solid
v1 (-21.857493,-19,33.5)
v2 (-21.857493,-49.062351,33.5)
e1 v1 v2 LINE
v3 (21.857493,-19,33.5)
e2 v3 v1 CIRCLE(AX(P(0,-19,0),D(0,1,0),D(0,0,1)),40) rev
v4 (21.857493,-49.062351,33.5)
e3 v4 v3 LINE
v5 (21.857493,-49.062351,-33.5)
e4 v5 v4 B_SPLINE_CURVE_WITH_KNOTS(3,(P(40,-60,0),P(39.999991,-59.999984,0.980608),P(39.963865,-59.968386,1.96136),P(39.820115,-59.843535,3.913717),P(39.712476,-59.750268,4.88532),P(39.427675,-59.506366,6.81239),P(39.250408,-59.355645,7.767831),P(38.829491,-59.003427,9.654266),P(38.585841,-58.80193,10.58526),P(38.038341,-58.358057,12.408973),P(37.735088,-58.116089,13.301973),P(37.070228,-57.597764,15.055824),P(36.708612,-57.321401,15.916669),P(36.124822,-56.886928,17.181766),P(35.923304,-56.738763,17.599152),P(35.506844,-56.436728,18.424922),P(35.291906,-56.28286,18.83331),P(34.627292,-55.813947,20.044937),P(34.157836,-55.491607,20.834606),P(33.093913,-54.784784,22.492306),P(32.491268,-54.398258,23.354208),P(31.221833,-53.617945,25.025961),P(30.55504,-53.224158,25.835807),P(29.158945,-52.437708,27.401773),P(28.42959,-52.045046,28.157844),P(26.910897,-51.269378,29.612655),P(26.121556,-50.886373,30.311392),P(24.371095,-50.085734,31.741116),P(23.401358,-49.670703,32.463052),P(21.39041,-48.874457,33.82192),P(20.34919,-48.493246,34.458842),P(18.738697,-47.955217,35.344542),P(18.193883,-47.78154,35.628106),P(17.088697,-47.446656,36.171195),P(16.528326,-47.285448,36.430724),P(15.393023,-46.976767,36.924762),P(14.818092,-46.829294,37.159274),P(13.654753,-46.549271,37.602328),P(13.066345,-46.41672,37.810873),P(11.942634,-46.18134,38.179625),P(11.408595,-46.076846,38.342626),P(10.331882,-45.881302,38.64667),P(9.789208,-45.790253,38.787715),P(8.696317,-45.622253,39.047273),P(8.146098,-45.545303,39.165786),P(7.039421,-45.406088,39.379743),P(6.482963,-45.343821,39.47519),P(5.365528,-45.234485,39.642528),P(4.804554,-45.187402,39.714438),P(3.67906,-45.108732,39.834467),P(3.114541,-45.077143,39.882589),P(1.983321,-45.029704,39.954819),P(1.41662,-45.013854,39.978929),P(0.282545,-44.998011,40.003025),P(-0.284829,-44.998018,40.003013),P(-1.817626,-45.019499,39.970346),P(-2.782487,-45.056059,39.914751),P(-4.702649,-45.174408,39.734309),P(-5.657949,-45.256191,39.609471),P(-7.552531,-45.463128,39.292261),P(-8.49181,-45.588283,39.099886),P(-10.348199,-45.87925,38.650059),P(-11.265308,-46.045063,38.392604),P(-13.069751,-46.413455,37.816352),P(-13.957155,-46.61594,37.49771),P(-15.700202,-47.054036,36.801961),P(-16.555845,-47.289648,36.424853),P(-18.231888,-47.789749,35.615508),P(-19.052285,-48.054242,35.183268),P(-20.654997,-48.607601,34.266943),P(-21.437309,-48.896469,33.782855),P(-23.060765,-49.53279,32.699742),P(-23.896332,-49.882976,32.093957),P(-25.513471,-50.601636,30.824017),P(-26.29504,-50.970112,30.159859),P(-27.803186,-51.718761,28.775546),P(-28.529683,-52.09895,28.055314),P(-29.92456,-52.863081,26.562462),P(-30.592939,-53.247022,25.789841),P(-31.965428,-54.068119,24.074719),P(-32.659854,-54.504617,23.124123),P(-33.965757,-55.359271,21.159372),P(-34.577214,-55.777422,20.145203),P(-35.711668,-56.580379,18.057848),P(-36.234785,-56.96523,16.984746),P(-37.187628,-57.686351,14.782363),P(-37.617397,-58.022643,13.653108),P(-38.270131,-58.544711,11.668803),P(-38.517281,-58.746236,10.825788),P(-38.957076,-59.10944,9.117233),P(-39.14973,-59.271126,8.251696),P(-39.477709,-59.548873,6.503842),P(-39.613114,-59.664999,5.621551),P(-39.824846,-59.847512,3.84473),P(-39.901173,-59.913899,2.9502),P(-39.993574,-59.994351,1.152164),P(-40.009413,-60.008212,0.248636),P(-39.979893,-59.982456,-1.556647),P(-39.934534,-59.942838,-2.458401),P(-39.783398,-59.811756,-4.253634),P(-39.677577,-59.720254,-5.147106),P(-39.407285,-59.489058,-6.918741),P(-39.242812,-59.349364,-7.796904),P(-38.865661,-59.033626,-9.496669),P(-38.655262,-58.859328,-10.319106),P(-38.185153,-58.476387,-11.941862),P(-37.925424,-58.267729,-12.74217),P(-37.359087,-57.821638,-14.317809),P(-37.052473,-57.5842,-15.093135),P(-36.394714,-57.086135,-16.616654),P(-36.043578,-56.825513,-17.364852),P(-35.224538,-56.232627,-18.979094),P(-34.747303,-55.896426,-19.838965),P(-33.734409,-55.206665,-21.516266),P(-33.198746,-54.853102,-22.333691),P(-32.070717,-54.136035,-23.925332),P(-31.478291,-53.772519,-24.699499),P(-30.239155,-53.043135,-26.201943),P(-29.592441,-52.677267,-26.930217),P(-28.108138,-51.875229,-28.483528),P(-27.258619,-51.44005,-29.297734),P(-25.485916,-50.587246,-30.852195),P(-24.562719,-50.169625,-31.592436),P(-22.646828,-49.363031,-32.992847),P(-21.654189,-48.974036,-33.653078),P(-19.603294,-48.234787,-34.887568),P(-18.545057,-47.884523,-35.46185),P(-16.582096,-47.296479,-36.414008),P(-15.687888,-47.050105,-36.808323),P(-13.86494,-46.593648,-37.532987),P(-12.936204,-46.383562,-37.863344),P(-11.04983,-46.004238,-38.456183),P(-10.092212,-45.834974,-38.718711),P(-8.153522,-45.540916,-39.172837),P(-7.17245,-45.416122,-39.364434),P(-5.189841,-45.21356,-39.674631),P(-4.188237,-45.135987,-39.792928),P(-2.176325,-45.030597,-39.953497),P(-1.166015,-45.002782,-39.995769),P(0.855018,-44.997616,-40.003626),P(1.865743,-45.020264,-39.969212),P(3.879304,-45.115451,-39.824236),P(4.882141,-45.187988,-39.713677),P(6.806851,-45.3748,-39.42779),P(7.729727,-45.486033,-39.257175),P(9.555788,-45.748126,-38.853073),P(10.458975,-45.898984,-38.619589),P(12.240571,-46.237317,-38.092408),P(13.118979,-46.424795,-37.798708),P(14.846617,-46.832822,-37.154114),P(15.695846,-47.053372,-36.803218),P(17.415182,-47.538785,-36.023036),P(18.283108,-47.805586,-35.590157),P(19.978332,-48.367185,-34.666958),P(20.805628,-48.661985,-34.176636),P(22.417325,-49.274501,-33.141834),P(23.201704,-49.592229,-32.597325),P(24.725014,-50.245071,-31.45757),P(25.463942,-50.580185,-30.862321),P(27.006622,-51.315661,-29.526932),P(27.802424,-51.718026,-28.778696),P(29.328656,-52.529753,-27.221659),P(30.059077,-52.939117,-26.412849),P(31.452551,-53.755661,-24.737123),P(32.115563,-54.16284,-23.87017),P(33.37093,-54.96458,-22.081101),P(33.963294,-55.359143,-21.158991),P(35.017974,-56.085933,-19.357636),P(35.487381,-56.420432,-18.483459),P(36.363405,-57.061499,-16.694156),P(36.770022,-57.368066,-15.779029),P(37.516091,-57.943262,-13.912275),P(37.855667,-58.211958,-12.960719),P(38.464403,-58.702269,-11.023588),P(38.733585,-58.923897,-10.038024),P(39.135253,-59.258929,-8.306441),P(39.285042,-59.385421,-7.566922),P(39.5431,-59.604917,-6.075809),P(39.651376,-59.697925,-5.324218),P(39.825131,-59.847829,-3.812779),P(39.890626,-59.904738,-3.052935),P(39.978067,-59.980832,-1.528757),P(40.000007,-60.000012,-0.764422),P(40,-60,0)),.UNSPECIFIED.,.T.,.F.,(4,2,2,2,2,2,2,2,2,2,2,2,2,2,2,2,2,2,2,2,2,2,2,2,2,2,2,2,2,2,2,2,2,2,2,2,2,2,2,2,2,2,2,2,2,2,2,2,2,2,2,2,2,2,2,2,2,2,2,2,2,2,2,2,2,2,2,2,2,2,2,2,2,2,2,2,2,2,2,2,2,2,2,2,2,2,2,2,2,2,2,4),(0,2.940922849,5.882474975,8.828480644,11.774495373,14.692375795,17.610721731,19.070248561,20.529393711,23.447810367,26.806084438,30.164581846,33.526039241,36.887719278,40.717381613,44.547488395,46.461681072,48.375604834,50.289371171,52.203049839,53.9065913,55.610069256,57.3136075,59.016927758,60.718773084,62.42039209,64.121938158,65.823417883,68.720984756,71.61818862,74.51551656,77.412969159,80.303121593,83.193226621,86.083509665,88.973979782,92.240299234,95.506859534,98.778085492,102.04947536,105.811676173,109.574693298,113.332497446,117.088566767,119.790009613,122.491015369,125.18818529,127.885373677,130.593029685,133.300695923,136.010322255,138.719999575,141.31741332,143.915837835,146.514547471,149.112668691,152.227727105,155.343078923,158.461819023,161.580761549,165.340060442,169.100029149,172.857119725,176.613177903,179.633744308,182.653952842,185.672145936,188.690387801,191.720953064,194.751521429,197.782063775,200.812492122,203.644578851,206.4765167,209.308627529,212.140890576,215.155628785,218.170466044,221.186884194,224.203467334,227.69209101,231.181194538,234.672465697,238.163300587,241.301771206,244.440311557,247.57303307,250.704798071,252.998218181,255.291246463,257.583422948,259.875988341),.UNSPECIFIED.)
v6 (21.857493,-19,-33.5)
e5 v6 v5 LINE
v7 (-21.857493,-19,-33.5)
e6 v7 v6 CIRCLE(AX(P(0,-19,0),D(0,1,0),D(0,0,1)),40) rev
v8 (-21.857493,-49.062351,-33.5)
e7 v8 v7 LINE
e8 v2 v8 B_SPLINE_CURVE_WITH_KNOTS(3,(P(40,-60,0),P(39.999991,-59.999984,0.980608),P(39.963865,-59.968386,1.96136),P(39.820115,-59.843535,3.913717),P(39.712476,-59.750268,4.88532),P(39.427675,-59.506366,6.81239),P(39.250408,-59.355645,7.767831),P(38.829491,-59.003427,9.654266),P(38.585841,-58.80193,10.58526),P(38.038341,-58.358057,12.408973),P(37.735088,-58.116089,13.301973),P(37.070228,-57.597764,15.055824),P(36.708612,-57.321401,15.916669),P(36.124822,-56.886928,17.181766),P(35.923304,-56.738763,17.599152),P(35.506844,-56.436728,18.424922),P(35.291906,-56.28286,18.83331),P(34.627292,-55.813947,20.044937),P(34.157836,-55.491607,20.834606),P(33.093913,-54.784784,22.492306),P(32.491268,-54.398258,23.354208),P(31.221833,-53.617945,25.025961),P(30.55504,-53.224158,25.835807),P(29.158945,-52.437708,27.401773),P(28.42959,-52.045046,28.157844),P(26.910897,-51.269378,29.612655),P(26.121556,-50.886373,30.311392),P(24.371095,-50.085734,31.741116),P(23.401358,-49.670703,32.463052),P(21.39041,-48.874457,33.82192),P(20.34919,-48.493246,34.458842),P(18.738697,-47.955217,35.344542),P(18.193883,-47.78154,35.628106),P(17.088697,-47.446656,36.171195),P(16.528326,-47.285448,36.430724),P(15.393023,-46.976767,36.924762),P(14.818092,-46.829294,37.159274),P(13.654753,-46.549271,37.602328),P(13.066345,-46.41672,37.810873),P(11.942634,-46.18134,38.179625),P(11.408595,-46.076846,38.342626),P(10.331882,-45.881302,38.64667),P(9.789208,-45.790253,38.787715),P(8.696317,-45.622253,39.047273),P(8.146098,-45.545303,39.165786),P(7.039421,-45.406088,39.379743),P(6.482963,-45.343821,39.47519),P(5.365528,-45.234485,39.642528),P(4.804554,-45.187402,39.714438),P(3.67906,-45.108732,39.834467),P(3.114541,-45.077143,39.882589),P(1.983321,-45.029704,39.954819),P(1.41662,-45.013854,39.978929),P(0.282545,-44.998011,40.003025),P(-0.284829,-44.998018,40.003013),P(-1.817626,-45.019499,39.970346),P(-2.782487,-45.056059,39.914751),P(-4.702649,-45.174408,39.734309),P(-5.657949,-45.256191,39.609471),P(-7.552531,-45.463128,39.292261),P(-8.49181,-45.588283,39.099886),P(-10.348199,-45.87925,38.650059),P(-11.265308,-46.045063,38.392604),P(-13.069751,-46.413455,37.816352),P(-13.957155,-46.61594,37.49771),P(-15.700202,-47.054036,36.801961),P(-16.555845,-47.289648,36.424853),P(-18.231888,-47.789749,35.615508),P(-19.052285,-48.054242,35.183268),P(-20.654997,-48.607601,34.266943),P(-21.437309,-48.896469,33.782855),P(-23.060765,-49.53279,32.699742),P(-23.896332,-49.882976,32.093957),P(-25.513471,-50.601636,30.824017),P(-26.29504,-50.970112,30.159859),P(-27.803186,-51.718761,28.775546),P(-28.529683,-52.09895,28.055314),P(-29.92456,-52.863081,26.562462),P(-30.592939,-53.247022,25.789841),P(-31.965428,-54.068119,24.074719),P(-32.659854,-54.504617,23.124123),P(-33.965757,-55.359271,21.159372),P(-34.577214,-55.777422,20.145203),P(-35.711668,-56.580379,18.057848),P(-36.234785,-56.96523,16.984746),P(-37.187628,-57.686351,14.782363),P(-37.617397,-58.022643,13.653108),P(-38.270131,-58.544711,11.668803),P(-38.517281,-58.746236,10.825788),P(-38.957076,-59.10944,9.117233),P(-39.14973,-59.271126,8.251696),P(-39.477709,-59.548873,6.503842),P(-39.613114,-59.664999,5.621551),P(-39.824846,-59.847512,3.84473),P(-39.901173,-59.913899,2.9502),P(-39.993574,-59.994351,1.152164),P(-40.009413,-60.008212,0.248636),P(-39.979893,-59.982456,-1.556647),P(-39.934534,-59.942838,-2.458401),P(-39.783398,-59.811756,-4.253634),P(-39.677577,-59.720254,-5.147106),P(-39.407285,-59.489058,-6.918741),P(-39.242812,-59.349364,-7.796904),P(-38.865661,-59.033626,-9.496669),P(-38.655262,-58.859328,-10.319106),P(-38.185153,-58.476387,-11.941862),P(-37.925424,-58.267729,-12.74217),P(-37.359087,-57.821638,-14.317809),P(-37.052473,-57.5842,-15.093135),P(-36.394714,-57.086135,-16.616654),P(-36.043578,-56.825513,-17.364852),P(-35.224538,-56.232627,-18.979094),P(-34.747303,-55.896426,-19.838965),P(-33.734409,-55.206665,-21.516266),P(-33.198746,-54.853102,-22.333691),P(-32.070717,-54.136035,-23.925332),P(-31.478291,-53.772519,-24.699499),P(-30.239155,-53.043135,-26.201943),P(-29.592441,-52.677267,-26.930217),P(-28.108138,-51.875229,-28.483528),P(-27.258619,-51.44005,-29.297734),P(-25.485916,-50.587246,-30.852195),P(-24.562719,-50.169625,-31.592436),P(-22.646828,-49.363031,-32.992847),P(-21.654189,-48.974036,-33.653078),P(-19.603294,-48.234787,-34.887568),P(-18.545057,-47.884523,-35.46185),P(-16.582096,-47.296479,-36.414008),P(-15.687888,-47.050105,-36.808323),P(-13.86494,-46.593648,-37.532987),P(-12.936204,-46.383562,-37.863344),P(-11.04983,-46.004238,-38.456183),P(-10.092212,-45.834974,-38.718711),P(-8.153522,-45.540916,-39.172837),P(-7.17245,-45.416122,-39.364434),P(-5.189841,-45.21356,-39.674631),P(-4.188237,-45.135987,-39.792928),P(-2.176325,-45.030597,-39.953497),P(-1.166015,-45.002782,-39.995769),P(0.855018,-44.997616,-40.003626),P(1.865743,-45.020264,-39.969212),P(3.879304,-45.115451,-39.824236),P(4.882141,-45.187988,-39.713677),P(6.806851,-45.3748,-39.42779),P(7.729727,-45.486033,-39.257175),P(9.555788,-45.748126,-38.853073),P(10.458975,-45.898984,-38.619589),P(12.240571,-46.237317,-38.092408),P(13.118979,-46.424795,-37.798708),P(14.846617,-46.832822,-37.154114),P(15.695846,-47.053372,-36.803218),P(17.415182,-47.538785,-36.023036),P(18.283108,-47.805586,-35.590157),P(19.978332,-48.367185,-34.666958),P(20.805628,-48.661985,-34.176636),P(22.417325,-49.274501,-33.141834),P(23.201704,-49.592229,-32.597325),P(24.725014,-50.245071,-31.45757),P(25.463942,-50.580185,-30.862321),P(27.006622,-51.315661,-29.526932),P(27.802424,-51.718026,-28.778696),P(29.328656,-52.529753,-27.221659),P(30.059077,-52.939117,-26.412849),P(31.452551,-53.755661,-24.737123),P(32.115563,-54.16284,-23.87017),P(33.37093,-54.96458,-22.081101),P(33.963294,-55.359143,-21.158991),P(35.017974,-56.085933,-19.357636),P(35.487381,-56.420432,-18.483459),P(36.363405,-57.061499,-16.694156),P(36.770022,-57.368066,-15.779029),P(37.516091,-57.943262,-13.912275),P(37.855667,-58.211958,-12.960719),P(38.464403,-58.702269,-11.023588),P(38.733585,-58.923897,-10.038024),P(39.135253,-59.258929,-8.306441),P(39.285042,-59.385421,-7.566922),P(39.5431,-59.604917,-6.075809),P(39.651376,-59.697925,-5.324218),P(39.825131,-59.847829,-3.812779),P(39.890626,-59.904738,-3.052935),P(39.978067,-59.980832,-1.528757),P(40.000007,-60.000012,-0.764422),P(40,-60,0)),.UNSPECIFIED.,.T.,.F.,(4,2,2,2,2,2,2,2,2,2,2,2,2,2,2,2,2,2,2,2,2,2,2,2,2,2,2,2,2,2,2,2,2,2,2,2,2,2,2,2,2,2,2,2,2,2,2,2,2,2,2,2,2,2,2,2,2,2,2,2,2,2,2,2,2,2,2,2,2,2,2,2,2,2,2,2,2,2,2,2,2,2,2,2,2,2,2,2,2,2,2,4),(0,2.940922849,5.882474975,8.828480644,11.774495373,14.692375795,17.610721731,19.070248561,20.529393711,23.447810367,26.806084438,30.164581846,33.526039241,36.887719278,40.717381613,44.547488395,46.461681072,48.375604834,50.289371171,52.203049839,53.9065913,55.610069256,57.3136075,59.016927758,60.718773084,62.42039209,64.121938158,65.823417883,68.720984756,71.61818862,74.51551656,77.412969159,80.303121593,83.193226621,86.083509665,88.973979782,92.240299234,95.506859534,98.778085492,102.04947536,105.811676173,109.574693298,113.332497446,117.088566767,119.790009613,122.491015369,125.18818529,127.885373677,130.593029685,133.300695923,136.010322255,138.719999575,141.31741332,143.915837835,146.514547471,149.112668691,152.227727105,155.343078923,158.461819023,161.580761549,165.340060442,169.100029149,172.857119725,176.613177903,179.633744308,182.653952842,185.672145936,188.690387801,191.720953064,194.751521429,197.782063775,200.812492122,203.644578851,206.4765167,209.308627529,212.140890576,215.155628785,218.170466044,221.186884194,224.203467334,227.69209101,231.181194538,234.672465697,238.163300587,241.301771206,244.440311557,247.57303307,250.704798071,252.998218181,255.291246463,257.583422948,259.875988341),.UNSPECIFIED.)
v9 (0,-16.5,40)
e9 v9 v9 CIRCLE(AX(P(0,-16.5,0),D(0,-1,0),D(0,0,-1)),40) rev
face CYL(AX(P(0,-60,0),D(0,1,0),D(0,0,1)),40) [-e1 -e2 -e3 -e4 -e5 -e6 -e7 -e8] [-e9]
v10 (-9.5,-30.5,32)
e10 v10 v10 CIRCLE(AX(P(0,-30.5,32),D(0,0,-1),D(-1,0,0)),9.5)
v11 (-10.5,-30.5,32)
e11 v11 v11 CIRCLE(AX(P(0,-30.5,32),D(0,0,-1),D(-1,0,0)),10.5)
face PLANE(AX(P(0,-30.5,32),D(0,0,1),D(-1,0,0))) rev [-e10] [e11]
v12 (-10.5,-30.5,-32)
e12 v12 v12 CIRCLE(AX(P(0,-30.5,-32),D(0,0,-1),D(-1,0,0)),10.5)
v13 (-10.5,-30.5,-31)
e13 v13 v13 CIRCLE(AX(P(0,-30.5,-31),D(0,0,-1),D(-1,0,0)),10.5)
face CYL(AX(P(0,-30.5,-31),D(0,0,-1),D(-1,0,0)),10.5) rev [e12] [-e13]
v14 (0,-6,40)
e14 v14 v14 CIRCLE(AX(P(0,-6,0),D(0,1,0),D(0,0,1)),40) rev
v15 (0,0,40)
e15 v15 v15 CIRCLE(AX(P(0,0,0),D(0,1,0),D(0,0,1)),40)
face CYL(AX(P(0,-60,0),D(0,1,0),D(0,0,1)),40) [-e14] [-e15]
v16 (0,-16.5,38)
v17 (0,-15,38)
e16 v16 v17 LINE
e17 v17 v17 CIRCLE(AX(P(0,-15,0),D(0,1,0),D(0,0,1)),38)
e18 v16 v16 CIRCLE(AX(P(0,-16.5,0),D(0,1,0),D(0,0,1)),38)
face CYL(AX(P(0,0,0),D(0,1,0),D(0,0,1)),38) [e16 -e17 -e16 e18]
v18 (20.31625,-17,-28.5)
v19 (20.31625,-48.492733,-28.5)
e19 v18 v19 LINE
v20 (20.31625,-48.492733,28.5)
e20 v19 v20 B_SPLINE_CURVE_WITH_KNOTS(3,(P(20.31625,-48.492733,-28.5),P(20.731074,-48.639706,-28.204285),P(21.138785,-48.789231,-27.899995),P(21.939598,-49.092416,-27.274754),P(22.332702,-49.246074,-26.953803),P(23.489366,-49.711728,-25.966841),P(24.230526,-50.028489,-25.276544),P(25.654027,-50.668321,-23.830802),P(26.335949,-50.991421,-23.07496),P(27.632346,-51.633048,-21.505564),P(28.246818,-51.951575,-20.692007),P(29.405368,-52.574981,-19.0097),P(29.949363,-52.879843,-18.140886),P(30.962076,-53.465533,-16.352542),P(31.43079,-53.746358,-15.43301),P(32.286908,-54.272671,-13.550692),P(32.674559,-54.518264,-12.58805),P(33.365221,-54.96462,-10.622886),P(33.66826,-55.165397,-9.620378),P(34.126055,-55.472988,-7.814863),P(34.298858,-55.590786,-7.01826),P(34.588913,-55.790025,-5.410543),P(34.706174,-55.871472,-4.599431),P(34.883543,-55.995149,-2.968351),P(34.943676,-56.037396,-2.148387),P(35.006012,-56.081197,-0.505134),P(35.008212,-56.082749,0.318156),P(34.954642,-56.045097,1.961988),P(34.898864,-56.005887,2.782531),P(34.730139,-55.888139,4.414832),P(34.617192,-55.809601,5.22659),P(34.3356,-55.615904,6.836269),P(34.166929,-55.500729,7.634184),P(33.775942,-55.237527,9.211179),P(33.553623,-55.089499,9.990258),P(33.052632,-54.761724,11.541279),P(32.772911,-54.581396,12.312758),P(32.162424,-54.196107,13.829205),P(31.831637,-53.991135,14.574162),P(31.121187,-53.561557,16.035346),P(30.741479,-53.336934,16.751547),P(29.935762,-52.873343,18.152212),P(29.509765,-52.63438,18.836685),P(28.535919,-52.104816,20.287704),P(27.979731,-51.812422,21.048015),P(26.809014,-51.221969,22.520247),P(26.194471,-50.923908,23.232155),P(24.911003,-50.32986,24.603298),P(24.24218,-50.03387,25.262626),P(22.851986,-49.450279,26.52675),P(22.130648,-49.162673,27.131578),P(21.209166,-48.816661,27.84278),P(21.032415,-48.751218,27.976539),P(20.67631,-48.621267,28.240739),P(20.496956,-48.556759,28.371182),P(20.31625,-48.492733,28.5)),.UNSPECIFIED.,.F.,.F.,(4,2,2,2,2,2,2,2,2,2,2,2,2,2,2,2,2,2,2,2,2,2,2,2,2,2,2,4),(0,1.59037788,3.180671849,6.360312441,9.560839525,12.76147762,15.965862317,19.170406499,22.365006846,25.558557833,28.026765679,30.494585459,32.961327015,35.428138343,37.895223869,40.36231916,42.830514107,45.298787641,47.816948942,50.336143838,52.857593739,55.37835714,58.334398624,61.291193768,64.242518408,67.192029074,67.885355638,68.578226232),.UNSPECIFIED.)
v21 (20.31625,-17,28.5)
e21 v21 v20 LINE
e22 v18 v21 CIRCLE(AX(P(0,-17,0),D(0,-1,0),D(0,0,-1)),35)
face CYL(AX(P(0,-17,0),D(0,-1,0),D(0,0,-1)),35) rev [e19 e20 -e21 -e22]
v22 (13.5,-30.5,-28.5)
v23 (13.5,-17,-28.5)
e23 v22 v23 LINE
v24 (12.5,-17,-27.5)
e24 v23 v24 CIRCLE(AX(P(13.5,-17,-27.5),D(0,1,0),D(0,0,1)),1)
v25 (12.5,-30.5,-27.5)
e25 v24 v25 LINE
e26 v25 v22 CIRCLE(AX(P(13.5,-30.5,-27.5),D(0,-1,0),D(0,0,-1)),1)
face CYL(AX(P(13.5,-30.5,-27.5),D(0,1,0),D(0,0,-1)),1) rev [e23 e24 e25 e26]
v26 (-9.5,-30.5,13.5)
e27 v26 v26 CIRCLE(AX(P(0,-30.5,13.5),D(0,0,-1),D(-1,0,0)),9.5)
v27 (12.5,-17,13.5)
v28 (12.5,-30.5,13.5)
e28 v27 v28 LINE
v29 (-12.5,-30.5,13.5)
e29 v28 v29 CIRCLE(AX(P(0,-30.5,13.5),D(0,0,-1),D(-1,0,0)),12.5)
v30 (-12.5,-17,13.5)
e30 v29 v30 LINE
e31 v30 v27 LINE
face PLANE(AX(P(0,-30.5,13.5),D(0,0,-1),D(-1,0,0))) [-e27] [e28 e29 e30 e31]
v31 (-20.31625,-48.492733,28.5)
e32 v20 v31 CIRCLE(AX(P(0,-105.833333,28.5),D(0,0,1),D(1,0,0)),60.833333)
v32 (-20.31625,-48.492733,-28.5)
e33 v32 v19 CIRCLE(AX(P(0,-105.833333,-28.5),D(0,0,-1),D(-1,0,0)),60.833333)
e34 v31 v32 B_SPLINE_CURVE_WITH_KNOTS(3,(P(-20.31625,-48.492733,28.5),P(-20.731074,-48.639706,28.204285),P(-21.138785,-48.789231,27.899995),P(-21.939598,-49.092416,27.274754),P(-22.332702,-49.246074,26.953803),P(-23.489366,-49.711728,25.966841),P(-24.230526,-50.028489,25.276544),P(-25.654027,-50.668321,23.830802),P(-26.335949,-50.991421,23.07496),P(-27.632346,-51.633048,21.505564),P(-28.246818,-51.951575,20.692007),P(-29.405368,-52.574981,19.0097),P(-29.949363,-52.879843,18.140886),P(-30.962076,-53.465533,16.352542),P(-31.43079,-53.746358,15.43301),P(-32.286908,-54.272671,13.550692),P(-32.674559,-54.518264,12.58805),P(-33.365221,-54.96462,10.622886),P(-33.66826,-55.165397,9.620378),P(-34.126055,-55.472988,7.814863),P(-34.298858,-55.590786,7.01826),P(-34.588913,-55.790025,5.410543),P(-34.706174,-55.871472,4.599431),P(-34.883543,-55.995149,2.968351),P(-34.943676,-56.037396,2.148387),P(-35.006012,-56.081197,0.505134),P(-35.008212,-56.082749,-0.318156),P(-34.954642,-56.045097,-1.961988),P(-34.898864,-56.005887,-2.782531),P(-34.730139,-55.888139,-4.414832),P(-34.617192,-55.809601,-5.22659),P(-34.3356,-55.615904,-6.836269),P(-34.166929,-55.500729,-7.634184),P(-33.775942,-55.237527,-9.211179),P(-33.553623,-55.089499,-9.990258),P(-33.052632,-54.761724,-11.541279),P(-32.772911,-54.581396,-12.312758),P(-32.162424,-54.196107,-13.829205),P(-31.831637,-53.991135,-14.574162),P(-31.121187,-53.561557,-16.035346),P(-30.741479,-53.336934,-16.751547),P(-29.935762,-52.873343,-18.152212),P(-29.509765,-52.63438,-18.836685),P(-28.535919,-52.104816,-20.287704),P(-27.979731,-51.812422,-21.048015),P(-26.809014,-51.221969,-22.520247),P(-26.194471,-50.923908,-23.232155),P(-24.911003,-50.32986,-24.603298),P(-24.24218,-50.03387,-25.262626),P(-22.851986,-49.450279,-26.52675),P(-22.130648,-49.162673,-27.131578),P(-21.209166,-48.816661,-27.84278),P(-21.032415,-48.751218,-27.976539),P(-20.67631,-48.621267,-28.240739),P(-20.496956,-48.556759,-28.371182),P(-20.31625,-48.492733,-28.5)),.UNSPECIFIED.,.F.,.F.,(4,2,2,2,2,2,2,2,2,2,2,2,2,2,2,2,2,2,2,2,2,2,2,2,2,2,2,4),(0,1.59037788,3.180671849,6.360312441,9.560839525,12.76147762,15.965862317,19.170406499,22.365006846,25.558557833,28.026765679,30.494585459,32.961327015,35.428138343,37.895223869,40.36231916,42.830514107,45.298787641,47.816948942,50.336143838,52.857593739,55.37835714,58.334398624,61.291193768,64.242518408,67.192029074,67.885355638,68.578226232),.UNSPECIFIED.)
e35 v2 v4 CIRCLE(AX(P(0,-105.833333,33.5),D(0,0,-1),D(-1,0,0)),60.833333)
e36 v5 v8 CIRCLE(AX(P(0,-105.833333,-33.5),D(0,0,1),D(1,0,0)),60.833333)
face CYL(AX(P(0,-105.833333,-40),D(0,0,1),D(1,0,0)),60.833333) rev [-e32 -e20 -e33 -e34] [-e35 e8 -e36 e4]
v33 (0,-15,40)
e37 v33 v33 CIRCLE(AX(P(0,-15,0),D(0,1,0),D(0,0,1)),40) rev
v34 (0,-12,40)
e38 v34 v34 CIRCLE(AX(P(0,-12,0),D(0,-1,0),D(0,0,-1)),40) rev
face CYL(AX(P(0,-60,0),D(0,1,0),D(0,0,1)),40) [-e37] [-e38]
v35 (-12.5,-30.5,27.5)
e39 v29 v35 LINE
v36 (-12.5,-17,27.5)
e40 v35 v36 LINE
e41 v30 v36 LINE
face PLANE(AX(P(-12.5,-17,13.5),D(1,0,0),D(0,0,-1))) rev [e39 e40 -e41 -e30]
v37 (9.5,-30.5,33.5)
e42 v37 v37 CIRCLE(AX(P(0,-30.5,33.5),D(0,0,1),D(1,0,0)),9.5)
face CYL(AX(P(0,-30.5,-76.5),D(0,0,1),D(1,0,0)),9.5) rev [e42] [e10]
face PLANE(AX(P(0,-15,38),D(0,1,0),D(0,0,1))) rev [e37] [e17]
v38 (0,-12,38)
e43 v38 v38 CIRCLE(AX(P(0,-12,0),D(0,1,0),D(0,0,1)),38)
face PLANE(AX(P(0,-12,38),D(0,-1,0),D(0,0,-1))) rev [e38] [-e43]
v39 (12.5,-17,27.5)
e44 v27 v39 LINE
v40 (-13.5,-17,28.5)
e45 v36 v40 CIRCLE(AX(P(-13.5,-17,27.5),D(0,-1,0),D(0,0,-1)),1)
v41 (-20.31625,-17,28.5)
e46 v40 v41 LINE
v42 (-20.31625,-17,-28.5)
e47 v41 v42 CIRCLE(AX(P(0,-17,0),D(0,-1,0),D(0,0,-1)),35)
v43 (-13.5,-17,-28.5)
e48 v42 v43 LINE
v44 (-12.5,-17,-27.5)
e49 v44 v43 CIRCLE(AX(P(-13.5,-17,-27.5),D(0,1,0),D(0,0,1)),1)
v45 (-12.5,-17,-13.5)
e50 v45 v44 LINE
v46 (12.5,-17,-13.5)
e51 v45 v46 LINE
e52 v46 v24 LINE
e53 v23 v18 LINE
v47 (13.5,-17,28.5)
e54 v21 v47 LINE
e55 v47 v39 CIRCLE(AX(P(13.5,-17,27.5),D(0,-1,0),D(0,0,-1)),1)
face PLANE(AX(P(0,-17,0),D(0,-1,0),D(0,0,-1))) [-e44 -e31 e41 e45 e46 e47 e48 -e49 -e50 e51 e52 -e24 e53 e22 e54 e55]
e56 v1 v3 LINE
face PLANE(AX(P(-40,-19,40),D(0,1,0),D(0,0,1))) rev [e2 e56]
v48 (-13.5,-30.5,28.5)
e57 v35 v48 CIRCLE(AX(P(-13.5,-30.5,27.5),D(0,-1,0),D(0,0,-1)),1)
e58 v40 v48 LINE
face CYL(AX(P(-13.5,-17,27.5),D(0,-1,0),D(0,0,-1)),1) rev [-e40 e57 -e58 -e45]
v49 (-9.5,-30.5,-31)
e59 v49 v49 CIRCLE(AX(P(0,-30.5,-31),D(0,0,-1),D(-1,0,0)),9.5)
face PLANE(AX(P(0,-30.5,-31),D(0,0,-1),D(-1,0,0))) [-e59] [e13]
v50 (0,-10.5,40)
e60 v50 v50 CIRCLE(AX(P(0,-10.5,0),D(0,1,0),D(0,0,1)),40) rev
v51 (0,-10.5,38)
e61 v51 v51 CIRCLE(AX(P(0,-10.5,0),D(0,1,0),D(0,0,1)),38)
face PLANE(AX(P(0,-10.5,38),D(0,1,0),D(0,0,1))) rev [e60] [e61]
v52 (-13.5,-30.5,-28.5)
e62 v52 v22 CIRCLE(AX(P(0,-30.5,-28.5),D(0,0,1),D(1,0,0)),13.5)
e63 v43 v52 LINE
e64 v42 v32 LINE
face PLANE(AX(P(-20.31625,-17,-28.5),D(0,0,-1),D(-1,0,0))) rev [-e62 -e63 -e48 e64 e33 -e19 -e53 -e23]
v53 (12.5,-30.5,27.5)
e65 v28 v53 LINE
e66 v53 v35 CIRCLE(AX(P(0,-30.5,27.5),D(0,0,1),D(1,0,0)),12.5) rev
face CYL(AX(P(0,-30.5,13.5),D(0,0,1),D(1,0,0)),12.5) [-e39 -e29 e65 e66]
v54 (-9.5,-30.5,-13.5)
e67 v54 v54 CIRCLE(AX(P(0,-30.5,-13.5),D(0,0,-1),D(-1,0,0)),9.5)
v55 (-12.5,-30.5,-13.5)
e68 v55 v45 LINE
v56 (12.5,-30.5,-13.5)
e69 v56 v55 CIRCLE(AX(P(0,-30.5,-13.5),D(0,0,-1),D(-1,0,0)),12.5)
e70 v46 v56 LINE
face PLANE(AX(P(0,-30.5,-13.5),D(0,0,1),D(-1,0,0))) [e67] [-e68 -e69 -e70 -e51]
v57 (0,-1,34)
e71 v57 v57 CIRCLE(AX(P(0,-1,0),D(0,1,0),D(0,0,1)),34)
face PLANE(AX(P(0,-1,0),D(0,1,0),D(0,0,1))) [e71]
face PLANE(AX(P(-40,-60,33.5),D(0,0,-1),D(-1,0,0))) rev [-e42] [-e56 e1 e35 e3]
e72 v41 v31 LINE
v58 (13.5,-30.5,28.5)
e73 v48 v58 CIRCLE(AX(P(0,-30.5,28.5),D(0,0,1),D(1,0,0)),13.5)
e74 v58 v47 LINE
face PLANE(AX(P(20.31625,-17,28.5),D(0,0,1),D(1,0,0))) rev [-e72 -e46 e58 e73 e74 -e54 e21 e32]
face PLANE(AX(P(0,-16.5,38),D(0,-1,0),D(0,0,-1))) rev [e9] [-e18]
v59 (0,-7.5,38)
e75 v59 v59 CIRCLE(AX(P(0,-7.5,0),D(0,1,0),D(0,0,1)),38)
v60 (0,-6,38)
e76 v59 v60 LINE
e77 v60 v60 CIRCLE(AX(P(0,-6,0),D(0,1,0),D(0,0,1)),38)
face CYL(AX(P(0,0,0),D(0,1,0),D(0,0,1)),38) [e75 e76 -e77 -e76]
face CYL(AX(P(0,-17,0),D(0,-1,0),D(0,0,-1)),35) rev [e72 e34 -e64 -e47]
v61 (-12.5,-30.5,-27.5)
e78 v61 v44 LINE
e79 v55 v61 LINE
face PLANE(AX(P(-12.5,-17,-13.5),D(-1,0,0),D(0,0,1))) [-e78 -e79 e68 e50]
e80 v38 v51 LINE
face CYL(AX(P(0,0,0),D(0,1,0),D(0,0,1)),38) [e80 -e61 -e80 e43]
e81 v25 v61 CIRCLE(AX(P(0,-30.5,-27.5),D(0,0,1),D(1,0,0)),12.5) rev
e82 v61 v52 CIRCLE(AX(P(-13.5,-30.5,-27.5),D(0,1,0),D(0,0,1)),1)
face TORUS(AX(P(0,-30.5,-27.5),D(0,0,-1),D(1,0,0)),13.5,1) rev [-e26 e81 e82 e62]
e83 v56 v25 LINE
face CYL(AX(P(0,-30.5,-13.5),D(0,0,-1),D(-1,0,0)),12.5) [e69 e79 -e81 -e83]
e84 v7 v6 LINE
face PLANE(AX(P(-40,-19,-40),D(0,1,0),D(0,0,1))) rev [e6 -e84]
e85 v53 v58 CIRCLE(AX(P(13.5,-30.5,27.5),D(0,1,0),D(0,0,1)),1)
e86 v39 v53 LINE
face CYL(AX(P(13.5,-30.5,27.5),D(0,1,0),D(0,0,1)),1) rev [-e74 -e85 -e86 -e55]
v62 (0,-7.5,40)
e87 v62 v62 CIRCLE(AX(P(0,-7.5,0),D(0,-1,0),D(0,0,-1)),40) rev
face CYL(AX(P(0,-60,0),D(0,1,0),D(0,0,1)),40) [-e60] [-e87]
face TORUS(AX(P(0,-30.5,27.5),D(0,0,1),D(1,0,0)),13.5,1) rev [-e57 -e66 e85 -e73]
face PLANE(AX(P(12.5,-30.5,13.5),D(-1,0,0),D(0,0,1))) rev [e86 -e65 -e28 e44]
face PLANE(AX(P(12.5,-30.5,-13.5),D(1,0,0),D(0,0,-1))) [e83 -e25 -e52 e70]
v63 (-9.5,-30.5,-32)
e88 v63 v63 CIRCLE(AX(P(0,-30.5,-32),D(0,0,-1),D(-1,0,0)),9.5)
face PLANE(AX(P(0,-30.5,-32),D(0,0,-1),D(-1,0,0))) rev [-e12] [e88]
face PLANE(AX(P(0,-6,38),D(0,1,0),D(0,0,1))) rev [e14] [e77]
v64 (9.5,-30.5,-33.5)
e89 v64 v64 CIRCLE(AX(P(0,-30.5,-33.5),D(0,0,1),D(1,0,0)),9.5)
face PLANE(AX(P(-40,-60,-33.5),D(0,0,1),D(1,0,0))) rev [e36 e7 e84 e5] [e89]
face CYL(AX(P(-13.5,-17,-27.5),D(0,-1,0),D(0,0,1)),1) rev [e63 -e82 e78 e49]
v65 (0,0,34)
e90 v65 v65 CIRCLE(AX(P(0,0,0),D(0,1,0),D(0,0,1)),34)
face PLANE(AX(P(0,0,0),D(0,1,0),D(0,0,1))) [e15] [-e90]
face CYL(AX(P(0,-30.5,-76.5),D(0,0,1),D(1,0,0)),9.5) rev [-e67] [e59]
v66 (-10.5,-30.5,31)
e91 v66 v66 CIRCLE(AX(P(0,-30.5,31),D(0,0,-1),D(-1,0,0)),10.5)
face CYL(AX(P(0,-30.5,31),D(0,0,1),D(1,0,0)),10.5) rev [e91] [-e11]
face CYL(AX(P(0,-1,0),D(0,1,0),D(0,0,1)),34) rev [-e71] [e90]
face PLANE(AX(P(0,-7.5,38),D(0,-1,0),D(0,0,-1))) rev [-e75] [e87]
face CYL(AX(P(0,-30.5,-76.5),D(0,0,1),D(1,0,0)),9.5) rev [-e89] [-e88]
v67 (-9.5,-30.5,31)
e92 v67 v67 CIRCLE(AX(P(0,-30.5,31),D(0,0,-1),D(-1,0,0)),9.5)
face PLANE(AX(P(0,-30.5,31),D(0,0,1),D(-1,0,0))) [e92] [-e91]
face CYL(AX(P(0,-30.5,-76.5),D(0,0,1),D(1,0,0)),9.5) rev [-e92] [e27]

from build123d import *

# Parameters (mm, degrees)
CROQUIS7_R                 = 40
SALIENTE_EXTRUIR3_DEPTH    = 60
CORTAR_EXTRUIR2_DEPTH      = 83.462112512
CORTAR_EXTRUIR2_DEPTH_BACK = 83.462112512
CROQUIS8_W                 = 6.5
CROQUIS8_H                 = 41
CROQUIS9_W                 = 4
CROQUIS9_H                 = 1.5
CORTAR_EXTRUIR3_DEPTH      = 43
CROQUIS11_R                = 34
CORTAR_EXTRUIR4_DEPTH      = 1
CROQUIS12_R                = 9.5
CORTAR_EXTRUIR5_DEPTH      = 110
CORTAR_EXTRUIR6_DEPTH      = 83.462112512
CORTAR_EXTRUIR6_DEPTH_BACK = 83.462112512
CROQUIS13_R                = 60.833333333
CROQUIS14_R                = 9.5
SALIENTE_EXTRUIR4_DEPTH    = 15
REDONDEO1_R                = 1
CROQUIS15_R                = 10.5
CROQUIS15_R_2              = 9.5
CORTAR_EXTRUIR7_DEPTH      = 0.5


# Read off the part's stored shape, not the designer's step: Simetría6
with BuildPart() as part:
    # Croquis7 → Saliente-Extruir3 (new body)
    with BuildSketch(Plane(origin=(0, 0, 0), x_dir=(1, 0, 0), z_dir=(0, 1, 0))):
        with Locations(Location((0, 0, 0), (0, 0, 270))):
            Circle(CROQUIS7_R)
    extrude(amount=-SALIENTE_EXTRUIR3_DEPTH)

    # Croquis8 → Cortar-Extruir2 (cut, two sides: drawn at the far end of the back side and taken through both)
    with BuildSketch(Plane(origin=(0, 0, 0), x_dir=(0, 0, -1), z_dir=(1, 0, 0)).offset(-CORTAR_EXTRUIR2_DEPTH_BACK)):
        with Locations((36.75, -39.5)):
            Rectangle(CROQUIS8_W, CROQUIS8_H)
        with Locations((-36.75, -39.5)):
            Rectangle(CROQUIS8_W, CROQUIS8_H)
    extrude(amount=CORTAR_EXTRUIR2_DEPTH + CORTAR_EXTRUIR2_DEPTH_BACK, mode=Mode.SUBTRACT)

    # Cortar-Barrer2: sweep along a curve in space
    with BuildLine() as cortar_barrer2_path:
        ThreePointArc((0, 0, 40), (28.284271247, 0, 28.284271247), (40, 0, 0))
        ThreePointArc((40, 0, 0), (28.284271247, 0, -28.284271247), (0, 0, -40))
        ThreePointArc((0, 0, -40), (-28.284271247, 0, -28.284271247), (-40, 0, 0))
        ThreePointArc((-40, 0, 0), (-28.284271247, 0, 28.284271247), (0, 0, 40))
    # Croquis9 → Cortar-Barrer2 (sweep, cut)
    with BuildSketch(Plane(origin=(0, 0, 0), x_dir=(0, 0, -1), z_dir=(1, 0, 0))):
        with Locations((-40, -6.75)):
            Rectangle(CROQUIS9_W, CROQUIS9_H)
        with Locations((-40, -11.25)):
            Rectangle(CROQUIS9_W, CROQUIS9_H)
        with Locations((-40, -15.75)):
            Rectangle(CROQUIS9_W, CROQUIS9_H)
    sweep(path=cortar_barrer2_path.line, mode=Mode.SUBTRACT)

    # Croquis10 → Cortar-Extruir3 (cut)
    with BuildSketch(Plane.XZ.offset(60)):
        with BuildLine():
            Line((-20.316249654, -28.5), (20.316249654, -28.5))
            ThreePointArc((20.316249654, -28.5), (35, 0), (20.316249654, 28.5))
            Line((20.316249654, 28.5), (-20.316249654, 28.5))
            ThreePointArc((-20.316249654, 28.5), (-35, 0), (-20.316249654, -28.5))
        make_face()
    extrude(amount=-CORTAR_EXTRUIR3_DEPTH, mode=Mode.SUBTRACT)

    # Croquis11 → Cortar-Extruir4 (cut)
    with BuildSketch(Plane(origin=(0, 0, 0), x_dir=(1, 0, 0), z_dir=(0, 1, 0))):
        with Locations(Location((0, 0, 0), (0, 0, 270))):
            Circle(CROQUIS11_R)
    extrude(amount=-CORTAR_EXTRUIR4_DEPTH, mode=Mode.SUBTRACT)

    # Croquis12 → Cortar-Extruir5 (cut)
    with BuildSketch(Plane.XY.offset(33.5)):
        with Locations((0, -30.5)):
            Circle(CROQUIS12_R)
    extrude(amount=-CORTAR_EXTRUIR5_DEPTH, mode=Mode.SUBTRACT)

    # Croquis13 → Cortar-Extruir6 (cut, two sides: drawn at the far end of the back side and taken through both)
    with BuildSketch(Plane.XY.offset(-CORTAR_EXTRUIR6_DEPTH_BACK)):
        with Locations((0, -105.833333333)):
            Circle(CROQUIS13_R)
    extrude(amount=CORTAR_EXTRUIR6_DEPTH + CORTAR_EXTRUIR6_DEPTH_BACK, mode=Mode.SUBTRACT)

    # Croquis14 → Saliente-Extruir4 (add)
    with BuildSketch(Plane(origin=(0, 0, 28.5), x_dir=(-1, 0, 0), z_dir=(0, 0, -1))):
        with BuildLine():
            Line((-12.5, -30.5), (-12.5, -17))
            Line((-12.5, -17), (12.5, -17))
            Line((12.5, -17), (12.5, -30.5))
            ThreePointArc((12.5, -30.5), (0, -43), (-12.5, -30.5))
        make_face()
        with Locations(Location((0, -30.5, 0), (0, 0, 180))):
            Circle(CROQUIS14_R, mode=Mode.SUBTRACT)
    saliente_extruir4 = extrude(amount=SALIENTE_EXTRUIR4_DEPTH)

    # Redondeo1
    redondeo1_edges = [part.edges().sort_by_distance(p)[0] for p in [
        (0, -43, 28.5),
        (-12.5, -23.75, 28.5),
        (12.5, -23.75, 28.5),
    ]]
    fillet(redondeo1_edges, radius=REDONDEO1_R)

    # Simetría4: Saliente-Extruir4 across plane
    add(saliente_extruir4.mirror(Plane.XY))

    # Simetría6
    split(bisect_by=Plane.XY, keep=Keep.TOP)

    # Simetr_a6 2: part across plane


with BuildPart() as part_1:
    add(part.part)
    add(part.part.mirror(Plane.XY))

    # Croquis15 → Cortar-Extruir7 (cut, symmetric)
    with BuildSketch(Plane(origin=(0, 0, -31.5), x_dir=(-1, 0, 0), z_dir=(0, 0, -1))):
        with Locations((0, -30.5)):
            Circle(CROQUIS15_R)
        with Locations((0, -30.5)):
            Circle(CROQUIS15_R_2, mode=Mode.SUBTRACT)
    cortar_extruir7 = extrude(amount=CORTAR_EXTRUIR7_DEPTH, both=True, mode=Mode.SUBTRACT)

    # Simetría7: Cortar-Extruir7 across plane
    add(cortar_extruir7.mirror(Plane.XY), mode=Mode.SUBTRACT)


solid = part_1.part
